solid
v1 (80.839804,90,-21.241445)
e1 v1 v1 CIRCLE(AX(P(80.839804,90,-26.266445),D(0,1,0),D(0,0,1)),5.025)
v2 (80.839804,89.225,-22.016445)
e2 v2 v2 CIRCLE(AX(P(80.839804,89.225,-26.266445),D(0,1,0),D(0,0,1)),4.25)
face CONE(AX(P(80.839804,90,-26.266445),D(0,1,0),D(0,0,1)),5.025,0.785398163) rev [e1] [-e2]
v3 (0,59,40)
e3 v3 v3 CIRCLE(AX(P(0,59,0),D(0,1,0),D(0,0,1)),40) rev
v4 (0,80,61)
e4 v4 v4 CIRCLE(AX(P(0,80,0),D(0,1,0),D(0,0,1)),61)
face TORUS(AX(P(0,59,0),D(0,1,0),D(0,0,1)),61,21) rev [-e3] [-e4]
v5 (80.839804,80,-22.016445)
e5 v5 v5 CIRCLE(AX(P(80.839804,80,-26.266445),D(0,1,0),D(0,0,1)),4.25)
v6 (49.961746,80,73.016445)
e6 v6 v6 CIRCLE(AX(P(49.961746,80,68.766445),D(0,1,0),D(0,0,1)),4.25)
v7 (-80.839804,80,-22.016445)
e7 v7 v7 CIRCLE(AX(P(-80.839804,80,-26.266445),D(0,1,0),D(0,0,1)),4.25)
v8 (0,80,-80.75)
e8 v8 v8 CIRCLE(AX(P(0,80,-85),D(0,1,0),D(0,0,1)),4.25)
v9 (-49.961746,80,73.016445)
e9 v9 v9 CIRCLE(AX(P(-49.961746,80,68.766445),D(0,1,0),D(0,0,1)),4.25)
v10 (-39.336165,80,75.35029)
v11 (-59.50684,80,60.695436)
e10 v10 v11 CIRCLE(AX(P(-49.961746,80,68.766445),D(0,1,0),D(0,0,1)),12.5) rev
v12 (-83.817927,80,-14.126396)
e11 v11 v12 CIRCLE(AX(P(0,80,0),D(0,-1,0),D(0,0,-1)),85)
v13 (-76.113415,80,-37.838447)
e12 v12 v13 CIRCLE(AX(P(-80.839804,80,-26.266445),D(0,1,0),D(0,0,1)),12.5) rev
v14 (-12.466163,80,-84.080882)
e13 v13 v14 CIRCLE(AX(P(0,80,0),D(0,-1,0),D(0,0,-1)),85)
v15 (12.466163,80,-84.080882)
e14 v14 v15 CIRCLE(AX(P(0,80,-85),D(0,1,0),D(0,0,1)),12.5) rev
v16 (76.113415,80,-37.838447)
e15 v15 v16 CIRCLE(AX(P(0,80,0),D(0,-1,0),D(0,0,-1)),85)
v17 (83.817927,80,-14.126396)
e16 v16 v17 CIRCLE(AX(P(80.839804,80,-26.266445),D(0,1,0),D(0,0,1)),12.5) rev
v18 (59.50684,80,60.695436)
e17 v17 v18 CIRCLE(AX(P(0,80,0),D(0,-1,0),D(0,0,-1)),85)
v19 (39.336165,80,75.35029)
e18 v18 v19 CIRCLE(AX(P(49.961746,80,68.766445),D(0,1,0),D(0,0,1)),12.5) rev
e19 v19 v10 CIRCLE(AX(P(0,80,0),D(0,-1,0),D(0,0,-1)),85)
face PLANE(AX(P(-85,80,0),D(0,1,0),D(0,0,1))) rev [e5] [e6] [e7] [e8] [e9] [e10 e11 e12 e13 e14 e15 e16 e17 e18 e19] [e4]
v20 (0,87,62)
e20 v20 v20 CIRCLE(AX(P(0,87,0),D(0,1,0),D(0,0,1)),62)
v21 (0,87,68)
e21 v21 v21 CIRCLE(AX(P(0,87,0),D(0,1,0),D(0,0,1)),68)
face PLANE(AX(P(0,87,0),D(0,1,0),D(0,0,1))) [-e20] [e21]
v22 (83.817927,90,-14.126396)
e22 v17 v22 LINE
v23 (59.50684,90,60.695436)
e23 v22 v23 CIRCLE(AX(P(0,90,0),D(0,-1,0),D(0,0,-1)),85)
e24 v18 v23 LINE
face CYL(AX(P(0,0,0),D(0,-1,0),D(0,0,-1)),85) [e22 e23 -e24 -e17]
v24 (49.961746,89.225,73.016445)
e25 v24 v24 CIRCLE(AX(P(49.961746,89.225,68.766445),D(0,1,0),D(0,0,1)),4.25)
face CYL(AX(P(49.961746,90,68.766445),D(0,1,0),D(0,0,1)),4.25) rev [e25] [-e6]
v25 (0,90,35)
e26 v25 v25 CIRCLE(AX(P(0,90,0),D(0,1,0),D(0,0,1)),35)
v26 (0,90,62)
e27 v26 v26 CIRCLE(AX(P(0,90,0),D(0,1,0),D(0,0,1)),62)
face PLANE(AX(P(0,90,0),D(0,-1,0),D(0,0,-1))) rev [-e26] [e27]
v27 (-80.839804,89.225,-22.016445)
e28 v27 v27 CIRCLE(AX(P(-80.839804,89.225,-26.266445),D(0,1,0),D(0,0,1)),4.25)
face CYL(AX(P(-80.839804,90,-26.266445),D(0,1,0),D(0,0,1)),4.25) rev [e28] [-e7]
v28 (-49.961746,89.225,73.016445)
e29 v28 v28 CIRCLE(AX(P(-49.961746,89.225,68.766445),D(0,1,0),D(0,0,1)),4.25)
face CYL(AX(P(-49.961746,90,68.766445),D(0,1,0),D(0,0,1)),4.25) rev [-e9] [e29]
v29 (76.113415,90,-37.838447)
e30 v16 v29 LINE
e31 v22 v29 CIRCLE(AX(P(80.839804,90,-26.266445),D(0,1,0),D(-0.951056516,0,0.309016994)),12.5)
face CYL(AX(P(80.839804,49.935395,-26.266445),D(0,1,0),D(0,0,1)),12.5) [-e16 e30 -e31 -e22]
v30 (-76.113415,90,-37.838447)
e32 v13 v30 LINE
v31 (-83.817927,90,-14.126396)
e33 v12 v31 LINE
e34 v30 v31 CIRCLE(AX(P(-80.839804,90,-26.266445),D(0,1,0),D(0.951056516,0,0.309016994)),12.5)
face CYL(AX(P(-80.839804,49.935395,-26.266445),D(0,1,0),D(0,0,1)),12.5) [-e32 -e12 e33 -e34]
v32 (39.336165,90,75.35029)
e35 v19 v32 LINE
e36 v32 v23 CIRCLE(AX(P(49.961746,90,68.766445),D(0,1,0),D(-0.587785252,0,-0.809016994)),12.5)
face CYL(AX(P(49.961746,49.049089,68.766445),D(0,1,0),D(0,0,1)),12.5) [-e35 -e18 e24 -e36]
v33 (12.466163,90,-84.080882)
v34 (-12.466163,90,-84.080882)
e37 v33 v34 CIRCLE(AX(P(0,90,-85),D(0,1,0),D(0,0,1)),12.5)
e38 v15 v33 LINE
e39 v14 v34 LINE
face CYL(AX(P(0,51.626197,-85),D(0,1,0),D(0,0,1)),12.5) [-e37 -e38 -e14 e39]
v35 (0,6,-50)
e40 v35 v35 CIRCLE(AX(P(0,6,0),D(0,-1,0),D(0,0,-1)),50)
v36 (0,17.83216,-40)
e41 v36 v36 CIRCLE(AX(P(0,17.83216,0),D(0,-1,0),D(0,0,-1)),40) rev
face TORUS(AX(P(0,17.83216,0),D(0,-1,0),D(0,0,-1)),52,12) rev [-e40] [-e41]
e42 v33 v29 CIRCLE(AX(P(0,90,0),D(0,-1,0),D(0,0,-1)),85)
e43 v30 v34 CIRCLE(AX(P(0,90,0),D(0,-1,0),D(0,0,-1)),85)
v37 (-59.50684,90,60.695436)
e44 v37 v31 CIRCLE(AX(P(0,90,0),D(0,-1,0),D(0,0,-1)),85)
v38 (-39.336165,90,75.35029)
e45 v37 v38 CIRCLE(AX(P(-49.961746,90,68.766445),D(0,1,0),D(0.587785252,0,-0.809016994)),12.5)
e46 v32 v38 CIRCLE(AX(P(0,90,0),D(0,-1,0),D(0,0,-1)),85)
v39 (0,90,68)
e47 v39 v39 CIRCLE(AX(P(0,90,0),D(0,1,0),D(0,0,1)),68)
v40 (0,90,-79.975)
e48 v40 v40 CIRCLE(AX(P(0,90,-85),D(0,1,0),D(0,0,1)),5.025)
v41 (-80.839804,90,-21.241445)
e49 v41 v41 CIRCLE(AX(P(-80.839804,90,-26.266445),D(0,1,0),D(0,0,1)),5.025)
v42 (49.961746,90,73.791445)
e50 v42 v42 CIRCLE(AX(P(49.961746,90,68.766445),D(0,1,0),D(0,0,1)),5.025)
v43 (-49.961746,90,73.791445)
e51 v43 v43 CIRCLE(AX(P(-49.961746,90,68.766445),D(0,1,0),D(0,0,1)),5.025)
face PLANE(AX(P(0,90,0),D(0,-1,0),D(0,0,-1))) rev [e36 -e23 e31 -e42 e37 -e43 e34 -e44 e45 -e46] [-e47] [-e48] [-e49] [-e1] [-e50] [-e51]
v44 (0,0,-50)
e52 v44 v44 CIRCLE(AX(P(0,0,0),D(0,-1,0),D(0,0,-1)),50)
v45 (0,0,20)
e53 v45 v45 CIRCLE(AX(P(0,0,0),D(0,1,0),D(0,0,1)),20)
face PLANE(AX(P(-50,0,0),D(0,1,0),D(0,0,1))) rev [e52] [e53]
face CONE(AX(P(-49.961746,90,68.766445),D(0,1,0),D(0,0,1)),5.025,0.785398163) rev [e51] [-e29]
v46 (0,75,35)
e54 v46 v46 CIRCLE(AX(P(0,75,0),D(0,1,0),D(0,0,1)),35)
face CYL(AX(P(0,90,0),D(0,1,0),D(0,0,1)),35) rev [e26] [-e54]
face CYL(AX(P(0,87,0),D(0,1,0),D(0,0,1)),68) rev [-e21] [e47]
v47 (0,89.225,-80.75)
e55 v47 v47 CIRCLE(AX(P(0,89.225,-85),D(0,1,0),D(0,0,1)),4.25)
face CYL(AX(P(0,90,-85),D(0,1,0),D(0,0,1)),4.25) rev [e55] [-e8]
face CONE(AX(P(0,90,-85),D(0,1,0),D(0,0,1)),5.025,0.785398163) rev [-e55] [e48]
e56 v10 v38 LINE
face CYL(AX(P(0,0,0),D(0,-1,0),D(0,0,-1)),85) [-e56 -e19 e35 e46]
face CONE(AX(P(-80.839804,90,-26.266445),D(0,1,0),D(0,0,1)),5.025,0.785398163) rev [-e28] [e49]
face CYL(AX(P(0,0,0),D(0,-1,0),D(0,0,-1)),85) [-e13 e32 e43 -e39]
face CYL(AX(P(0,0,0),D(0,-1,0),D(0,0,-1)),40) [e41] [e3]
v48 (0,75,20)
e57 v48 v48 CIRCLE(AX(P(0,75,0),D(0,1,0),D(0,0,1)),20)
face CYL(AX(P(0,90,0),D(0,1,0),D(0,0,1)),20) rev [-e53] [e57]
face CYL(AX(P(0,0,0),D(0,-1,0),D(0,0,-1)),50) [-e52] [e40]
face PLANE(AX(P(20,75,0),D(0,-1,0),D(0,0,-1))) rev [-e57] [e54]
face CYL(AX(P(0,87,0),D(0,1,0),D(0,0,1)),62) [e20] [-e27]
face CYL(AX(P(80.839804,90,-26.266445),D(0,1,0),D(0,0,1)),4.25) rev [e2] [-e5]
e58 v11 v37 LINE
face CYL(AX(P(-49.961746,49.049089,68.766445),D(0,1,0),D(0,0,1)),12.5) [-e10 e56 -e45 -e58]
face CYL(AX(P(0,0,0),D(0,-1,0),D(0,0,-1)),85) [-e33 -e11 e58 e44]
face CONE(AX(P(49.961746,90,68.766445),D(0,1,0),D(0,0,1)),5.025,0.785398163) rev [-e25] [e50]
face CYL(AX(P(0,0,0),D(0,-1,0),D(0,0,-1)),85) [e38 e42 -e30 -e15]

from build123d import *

# Parameters (mm, degrees)
HOLE1_D                      = 40
HOLE1_CBORE_D                = 70
HOLE1_CBORE_DEPTH            = 15
SKETCH4_R                    = 68
SKETCH4_R_2                  = 62
CUT_EXTRUDE1_DEPTH           = 3
FILLET1_R                    = 21
FILLET2_R                    = 12
BOSS_EXTRUDE1_START          = -10
BOSS_EXTRUDE1_DEPTH          = 10
CIRPATTERN1_COUNT            = 5
M10_TAPPED_HOLE1_D           = 8.5
M10_TAPPED_HOLE1_DEPTH       = 21.946342369
M10_TAPPED_HOLE1_CSINK_D     = 10.05
M10_TAPPED_HOLE1_CSINK_ANGLE = 90
M10_TAPPED_HOLE1_TIP         = 2.553657631


with BuildPart() as part:
    # Sketch1 → Revolve1 (revolve)
    with BuildSketch(Plane.XY, mode=Mode.PRIVATE) as revolve1_sk:
        Polygon((0, 0), (0, 90), (-85, 90), (-85, 80), (-40, 80), (-40, 6), (-50, 6), (-50, 0), align=None)
    revolve(revolve1_sk.sketch.rotate(Axis((0, 0, 0), (0, 1, 0)), 270), axis=Axis((0, 0, 0), (0, 1, 0)))

    # Hole1 (through all)
    with Locations(Plane(origin=(0, 90, 0), x_dir=(1, 0, 0), z_dir=(0, 1, 0))):
        with Locations((0, 0)):
            CounterBoreHole(HOLE1_D / 2, HOLE1_CBORE_D / 2, HOLE1_CBORE_DEPTH)

    # Sketch4 → Cut-Extrude1 (cut)
    with BuildSketch(Plane(origin=(0, 90, 0), x_dir=(1, 0, 0), z_dir=(0, 1, 0))):
        with Locations(Location((0, 0, 0), (0, 0, 270))):
            Circle(SKETCH4_R)
        with Locations(Location((0, 0, 0), (0, 0, 270))):
            Circle(SKETCH4_R_2, mode=Mode.SUBTRACT)
    extrude(amount=-CUT_EXTRUDE1_DEPTH, mode=Mode.SUBTRACT)

    # Fillet1
    fillet1_edges = [part.edges().sort_by_distance(p)[0] for p in [
        (0, 80, 40),
    ]]
    fillet(fillet1_edges, radius=FILLET1_R)

    # Fillet2
    # the kernel refuses this fillet: 12 mm, written as the material it adds along each edge
    with BuildSketch(Plane(origin=(0, 6, 0), x_dir=(0, 0, -1), z_dir=(1, 0, 0))) as fillet2_piece_1:
        with BuildLine():
            CenterArc((52, 11.832159566), FILLET2_R, 180, 80.405931773)
            Line((50, 0), (49.96, -0.236643191))
            ThreePointArc((49.96, -0.236643191), (45, -0.24), (40, -0.24))
            Line((40, -0.24), (39.76, 0))
            Line((39.76, 0), (39.76, 11.832159566))
            Line((39.76, 11.832159566), (40, 11.832159566))
        make_face()
    revolve(axis=Axis((0, 6, 0), (0, 1, 0)))

    # Sketch5 → Boss-Extrude1 (add)
    with BuildSketch(Plane(origin=(0, 90, 0), x_dir=(1, 0, 0), z_dir=(0, 1, 0)).offset(BOSS_EXTRUDE1_START)):
        with BuildLine():
            ThreePointArc((12.466163113, 84.080882353), (0, 97.5), (-12.466163113, 84.080882353))
            ThreePointArc((-12.466163113, 84.080882353), (0, 85), (12.466163113, 84.080882353))
        make_face()
    boss_extrude1 = extrude(amount=BOSS_EXTRUDE1_DEPTH)

    # CirPattern1: Boss-Extrude1 ×5 about axis
    cirpattern1_axis = Axis((0, 0, 0), (0, 1, 0))
    for i in range(1, CIRPATTERN1_COUNT):
        add(boss_extrude1.rotate(cirpattern1_axis, i * 360 / CIRPATTERN1_COUNT))

    # M10 Tapped Hole1
    with Locations(Plane(origin=(0, 90, 0), x_dir=(1, 0, 0), z_dir=(0, 1, 0))):
        with Locations((49.961746445, -68.766444522), (-49.961746445, -68.766444522), (80.839803885, 26.266444522), (0, 85), (-80.839803885, 26.266444522)):
            CounterSinkHole(M10_TAPPED_HOLE1_D / 2, M10_TAPPED_HOLE1_CSINK_D / 2, depth=M10_TAPPED_HOLE1_DEPTH, counter_sink_angle=M10_TAPPED_HOLE1_CSINK_ANGLE)
            with Locations((0, 0, -(M10_TAPPED_HOLE1_DEPTH + M10_TAPPED_HOLE1_TIP / 2))):  # 118° drill point
                Cone(0, M10_TAPPED_HOLE1_D / 2, M10_TAPPED_HOLE1_TIP, mode=Mode.SUBTRACT)


solid = part.part
